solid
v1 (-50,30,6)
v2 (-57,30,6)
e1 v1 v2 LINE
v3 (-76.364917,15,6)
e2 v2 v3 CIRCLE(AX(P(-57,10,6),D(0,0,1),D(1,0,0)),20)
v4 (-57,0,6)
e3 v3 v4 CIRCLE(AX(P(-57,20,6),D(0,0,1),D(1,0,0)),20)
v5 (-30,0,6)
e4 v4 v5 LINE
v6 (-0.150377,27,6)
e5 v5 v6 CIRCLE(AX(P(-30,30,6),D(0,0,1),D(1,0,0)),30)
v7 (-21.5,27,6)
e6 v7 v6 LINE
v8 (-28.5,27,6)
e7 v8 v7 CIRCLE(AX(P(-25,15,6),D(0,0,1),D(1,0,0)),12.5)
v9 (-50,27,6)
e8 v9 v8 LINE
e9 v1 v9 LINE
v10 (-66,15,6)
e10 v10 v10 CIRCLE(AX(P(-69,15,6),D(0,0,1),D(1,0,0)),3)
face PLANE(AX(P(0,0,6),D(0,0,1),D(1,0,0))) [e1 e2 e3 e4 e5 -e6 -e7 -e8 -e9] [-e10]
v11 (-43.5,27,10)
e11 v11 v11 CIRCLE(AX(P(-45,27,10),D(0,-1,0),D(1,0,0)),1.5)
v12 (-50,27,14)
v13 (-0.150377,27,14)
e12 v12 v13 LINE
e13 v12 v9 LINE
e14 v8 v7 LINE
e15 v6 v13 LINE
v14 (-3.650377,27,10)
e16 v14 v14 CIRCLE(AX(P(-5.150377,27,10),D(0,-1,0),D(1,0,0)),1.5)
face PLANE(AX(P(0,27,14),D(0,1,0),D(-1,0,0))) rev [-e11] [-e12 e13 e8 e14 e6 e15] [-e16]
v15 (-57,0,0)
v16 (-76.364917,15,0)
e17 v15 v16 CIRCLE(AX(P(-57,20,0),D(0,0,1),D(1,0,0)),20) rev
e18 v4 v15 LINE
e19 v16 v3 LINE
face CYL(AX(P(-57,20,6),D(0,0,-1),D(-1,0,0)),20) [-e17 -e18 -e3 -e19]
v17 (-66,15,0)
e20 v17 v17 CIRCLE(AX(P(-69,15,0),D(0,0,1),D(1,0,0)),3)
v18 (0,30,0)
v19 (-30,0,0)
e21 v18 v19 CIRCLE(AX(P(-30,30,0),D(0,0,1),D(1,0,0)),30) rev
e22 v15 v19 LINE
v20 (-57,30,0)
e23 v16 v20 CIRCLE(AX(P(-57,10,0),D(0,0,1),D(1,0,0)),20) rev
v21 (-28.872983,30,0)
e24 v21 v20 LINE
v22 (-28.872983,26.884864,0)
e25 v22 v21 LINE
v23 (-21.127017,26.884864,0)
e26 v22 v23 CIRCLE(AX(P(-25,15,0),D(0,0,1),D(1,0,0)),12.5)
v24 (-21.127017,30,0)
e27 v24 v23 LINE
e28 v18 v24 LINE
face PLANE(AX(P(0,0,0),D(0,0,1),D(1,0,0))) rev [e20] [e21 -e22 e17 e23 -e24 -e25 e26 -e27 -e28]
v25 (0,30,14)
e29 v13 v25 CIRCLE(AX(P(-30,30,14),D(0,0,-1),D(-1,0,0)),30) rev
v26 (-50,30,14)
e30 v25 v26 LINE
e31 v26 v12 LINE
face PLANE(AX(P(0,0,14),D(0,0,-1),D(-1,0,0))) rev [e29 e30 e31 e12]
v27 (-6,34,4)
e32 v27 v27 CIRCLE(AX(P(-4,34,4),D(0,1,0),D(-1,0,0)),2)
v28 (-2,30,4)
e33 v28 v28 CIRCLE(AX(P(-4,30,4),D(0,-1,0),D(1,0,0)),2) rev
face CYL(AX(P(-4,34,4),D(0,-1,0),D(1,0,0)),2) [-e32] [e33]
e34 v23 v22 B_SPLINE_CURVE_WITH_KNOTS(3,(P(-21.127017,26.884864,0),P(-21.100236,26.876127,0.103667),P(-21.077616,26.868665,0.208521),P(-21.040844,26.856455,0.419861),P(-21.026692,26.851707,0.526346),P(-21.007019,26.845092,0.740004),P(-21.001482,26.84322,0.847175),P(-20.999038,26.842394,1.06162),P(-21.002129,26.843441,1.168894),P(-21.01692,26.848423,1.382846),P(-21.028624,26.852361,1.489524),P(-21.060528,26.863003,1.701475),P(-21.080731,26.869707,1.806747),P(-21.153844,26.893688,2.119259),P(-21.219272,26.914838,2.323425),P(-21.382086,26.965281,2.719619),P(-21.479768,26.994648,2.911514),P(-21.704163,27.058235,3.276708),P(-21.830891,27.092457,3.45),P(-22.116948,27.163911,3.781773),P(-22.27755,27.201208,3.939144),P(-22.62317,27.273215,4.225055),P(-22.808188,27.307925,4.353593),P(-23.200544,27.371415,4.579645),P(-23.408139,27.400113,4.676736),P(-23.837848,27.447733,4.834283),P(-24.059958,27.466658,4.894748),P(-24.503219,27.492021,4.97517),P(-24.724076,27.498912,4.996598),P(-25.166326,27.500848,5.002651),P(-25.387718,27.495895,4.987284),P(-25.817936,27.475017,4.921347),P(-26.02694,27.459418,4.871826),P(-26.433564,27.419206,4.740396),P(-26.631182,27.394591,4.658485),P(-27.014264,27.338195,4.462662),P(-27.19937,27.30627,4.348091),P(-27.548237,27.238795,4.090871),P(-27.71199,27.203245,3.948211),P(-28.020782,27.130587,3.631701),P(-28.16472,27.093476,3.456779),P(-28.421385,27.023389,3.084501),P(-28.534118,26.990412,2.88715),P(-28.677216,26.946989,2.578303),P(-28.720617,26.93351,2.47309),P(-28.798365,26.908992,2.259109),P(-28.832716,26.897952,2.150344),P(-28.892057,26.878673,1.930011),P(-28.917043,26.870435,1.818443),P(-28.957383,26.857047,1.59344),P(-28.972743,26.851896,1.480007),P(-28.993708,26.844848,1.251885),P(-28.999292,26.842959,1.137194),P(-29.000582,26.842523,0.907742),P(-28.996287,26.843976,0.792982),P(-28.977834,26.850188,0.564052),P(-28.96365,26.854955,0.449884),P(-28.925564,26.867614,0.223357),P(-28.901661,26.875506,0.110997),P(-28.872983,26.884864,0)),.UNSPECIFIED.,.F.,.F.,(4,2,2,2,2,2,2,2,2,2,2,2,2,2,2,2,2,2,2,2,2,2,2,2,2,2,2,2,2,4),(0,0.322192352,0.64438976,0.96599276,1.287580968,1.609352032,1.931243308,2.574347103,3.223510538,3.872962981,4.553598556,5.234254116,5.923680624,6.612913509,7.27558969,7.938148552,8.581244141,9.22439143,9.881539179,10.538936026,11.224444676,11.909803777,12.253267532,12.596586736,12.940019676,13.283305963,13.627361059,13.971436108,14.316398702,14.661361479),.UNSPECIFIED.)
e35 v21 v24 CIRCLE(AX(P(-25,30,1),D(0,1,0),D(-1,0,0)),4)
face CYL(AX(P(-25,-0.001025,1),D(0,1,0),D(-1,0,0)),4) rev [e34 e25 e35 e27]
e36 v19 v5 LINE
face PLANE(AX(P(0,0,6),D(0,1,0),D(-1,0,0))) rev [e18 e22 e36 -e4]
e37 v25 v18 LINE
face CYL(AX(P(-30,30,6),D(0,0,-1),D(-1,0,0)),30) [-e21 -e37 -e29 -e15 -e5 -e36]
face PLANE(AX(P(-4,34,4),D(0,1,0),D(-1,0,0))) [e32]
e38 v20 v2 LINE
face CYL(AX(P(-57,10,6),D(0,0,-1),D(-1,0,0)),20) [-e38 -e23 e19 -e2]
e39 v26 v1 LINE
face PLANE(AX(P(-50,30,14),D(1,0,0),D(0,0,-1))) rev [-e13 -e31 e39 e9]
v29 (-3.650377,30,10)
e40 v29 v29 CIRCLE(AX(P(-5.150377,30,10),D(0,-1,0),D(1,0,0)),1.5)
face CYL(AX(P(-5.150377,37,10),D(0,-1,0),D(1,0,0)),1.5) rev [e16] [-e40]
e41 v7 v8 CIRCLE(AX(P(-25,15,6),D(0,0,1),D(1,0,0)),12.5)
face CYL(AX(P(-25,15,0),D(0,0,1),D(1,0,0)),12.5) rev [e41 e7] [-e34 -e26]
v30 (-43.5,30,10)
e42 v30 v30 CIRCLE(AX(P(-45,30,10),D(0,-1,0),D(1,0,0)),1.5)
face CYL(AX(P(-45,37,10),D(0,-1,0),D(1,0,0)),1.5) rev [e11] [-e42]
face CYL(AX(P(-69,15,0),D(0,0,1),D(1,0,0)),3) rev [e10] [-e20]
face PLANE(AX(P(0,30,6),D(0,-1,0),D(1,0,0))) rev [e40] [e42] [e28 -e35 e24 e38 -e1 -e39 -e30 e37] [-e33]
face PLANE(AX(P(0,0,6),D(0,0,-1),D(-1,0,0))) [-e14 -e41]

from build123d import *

# Parameters (mm, degrees)
ESQUISSE1_W                  = 77
ESQUISSE1_H                  = 30
BOSS_EXTRU_1_DEPTH           = 6
ESQUISSE2_R                  = 12.5
ESQUISSE2_R_2                = 3
ENL_V_MAT_EXTRU_1_DEPTH      = 6
ESQUISSE3_W                  = 50
ESQUISSE3_H                  = 3
BOSS_EXTRU_2_DEPTH           = 8
ENL_V_MAT_EXTRU_2_REACH      = 85.815
ENL_V_MAT_EXTRU_2_END_RADIUS = 12.5
ESQUISSE5_R                  = 4
CONG_1_R                     = 20
CONG_2_R                     = 30
ESQUISSE6_R                  = 2
BOSS_EXTRU_3_DEPTH           = 4
ESQUISSE7_R                  = 1.5
ENL_V_MAT_EXTRU_3_DEPTH      = 10


with BuildPart() as part:
    # Esquisse1 → Boss.-Extru.1 (new body)
    with BuildSketch(Plane.XY):
        with Locations((-38.5, 15)):
            Rectangle(ESQUISSE1_W, ESQUISSE1_H)
    extrude(amount=BOSS_EXTRU_1_DEPTH)

    # Esquisse2 → Enlèv. mat.-Extru.1 (cut)
    with BuildSketch(Plane.XY.offset(6)):
        with Locations((-25, 15)):
            Circle(ESQUISSE2_R)
        with Locations((-69, 15)):
            Circle(ESQUISSE2_R_2)
    extrude(amount=-ENL_V_MAT_EXTRU_1_DEPTH, mode=Mode.SUBTRACT)

    # Esquisse3 → Boss.-Extru.2 (add)
    with BuildSketch(Plane.XY.offset(6)):
        with Locations((-25, 28.5)):
            Rectangle(ESQUISSE3_W, ESQUISSE3_H)
    extrude(amount=BOSS_EXTRU_2_DEPTH)

    # Enlèv. mat.-Extru.2: up to this cylinder (the profile starts outside it)
    enl_v_mat_extru_2_end = Plane(origin=(-25, 15, 1), z_dir=(0, 0, 1)) * Cylinder(ENL_V_MAT_EXTRU_2_END_RADIUS, 197.63, mode=Mode.PRIVATE)
    # Esquisse5 → Enlèv. mat.-Extru.2 (cut, up to the surface)
    with BuildSketch(Plane(origin=(0, 30, 0), x_dir=(1, 0, 0), z_dir=(0, 1, 0)), mode=Mode.PRIVATE) as enl_v_mat_extru_2_sk1:
        with Locations((-25, -1)):
            Circle(ESQUISSE5_R)
    enl_v_mat_extru_2_tool1 = extrude(enl_v_mat_extru_2_sk1.sketch, amount=-ENL_V_MAT_EXTRU_2_REACH, mode=Mode.PRIVATE) - enl_v_mat_extru_2_end
    add(enl_v_mat_extru_2_tool1.solids().sort_by_distance((-25, 30, 1))[0], mode=Mode.SUBTRACT)

    # Congé1
    # the kernel refuses this fillet: 20 mm, written as the material it takes off along each edge
    with BuildSketch(Plane(origin=(-77, 30, -50), x_dir=(1, 0, 0), z_dir=(0, 0, 1))) as cong_1_piece_1:
        with BuildLine():
            CenterArc((CONG_1_R, -CONG_1_R), CONG_1_R, 90, 90)
            Line((0, -CONG_1_R), (0, 0))
            Line((0, 0), (CONG_1_R, 0))
        make_face()
    extrude(amount=106, mode=Mode.SUBTRACT)
    with BuildSketch(Plane(origin=(-77, 0, -50), x_dir=(1, 0, 0), z_dir=(0, 0, 1))) as cong_1_piece_2:
        with BuildLine():
            CenterArc((CONG_1_R, CONG_1_R), CONG_1_R, 180, 90)
            Line((0, CONG_1_R), (0, 0))
            Line((0, 0), (CONG_1_R, 0))
        make_face()
    extrude(amount=106, mode=Mode.SUBTRACT)

    # Congé2
    # the kernel refuses this fillet: 30 mm, written as the material it takes off along each edge
    with BuildSketch(Plane(origin=(0, 0, -75), x_dir=(-1, 0, 0), z_dir=(0, 0, 1))) as cong_2_piece_1:
        with BuildLine():
            CenterArc((CONG_2_R, -CONG_2_R), CONG_2_R, 90, 90)
            Line((0, -CONG_2_R), (0, 0))
            Line((0, 0), (CONG_2_R, 0))
        make_face()
    extrude(amount=156, mode=Mode.SUBTRACT)

    # Esquisse6 → Boss.-Extru.3 (add)
    with BuildSketch(Plane(origin=(0, 30, 0), x_dir=(1, 0, 0), z_dir=(0, 1, 0))):
        with Locations((-4, -4)):
            Circle(ESQUISSE6_R)
    extrude(amount=BOSS_EXTRU_3_DEPTH)

    # Esquisse7 → Enlèv. mat.-Extru.3 (cut)
    with BuildSketch(Plane.XZ.offset(-27)):
        with Locations((-45, 10)):
            Circle(ESQUISSE7_R)
        with Locations((-5.150376887, 10)):
            Circle(ESQUISSE7_R)
    extrude(amount=-ENL_V_MAT_EXTRU_3_DEPTH, mode=Mode.SUBTRACT)


solid = part.part
